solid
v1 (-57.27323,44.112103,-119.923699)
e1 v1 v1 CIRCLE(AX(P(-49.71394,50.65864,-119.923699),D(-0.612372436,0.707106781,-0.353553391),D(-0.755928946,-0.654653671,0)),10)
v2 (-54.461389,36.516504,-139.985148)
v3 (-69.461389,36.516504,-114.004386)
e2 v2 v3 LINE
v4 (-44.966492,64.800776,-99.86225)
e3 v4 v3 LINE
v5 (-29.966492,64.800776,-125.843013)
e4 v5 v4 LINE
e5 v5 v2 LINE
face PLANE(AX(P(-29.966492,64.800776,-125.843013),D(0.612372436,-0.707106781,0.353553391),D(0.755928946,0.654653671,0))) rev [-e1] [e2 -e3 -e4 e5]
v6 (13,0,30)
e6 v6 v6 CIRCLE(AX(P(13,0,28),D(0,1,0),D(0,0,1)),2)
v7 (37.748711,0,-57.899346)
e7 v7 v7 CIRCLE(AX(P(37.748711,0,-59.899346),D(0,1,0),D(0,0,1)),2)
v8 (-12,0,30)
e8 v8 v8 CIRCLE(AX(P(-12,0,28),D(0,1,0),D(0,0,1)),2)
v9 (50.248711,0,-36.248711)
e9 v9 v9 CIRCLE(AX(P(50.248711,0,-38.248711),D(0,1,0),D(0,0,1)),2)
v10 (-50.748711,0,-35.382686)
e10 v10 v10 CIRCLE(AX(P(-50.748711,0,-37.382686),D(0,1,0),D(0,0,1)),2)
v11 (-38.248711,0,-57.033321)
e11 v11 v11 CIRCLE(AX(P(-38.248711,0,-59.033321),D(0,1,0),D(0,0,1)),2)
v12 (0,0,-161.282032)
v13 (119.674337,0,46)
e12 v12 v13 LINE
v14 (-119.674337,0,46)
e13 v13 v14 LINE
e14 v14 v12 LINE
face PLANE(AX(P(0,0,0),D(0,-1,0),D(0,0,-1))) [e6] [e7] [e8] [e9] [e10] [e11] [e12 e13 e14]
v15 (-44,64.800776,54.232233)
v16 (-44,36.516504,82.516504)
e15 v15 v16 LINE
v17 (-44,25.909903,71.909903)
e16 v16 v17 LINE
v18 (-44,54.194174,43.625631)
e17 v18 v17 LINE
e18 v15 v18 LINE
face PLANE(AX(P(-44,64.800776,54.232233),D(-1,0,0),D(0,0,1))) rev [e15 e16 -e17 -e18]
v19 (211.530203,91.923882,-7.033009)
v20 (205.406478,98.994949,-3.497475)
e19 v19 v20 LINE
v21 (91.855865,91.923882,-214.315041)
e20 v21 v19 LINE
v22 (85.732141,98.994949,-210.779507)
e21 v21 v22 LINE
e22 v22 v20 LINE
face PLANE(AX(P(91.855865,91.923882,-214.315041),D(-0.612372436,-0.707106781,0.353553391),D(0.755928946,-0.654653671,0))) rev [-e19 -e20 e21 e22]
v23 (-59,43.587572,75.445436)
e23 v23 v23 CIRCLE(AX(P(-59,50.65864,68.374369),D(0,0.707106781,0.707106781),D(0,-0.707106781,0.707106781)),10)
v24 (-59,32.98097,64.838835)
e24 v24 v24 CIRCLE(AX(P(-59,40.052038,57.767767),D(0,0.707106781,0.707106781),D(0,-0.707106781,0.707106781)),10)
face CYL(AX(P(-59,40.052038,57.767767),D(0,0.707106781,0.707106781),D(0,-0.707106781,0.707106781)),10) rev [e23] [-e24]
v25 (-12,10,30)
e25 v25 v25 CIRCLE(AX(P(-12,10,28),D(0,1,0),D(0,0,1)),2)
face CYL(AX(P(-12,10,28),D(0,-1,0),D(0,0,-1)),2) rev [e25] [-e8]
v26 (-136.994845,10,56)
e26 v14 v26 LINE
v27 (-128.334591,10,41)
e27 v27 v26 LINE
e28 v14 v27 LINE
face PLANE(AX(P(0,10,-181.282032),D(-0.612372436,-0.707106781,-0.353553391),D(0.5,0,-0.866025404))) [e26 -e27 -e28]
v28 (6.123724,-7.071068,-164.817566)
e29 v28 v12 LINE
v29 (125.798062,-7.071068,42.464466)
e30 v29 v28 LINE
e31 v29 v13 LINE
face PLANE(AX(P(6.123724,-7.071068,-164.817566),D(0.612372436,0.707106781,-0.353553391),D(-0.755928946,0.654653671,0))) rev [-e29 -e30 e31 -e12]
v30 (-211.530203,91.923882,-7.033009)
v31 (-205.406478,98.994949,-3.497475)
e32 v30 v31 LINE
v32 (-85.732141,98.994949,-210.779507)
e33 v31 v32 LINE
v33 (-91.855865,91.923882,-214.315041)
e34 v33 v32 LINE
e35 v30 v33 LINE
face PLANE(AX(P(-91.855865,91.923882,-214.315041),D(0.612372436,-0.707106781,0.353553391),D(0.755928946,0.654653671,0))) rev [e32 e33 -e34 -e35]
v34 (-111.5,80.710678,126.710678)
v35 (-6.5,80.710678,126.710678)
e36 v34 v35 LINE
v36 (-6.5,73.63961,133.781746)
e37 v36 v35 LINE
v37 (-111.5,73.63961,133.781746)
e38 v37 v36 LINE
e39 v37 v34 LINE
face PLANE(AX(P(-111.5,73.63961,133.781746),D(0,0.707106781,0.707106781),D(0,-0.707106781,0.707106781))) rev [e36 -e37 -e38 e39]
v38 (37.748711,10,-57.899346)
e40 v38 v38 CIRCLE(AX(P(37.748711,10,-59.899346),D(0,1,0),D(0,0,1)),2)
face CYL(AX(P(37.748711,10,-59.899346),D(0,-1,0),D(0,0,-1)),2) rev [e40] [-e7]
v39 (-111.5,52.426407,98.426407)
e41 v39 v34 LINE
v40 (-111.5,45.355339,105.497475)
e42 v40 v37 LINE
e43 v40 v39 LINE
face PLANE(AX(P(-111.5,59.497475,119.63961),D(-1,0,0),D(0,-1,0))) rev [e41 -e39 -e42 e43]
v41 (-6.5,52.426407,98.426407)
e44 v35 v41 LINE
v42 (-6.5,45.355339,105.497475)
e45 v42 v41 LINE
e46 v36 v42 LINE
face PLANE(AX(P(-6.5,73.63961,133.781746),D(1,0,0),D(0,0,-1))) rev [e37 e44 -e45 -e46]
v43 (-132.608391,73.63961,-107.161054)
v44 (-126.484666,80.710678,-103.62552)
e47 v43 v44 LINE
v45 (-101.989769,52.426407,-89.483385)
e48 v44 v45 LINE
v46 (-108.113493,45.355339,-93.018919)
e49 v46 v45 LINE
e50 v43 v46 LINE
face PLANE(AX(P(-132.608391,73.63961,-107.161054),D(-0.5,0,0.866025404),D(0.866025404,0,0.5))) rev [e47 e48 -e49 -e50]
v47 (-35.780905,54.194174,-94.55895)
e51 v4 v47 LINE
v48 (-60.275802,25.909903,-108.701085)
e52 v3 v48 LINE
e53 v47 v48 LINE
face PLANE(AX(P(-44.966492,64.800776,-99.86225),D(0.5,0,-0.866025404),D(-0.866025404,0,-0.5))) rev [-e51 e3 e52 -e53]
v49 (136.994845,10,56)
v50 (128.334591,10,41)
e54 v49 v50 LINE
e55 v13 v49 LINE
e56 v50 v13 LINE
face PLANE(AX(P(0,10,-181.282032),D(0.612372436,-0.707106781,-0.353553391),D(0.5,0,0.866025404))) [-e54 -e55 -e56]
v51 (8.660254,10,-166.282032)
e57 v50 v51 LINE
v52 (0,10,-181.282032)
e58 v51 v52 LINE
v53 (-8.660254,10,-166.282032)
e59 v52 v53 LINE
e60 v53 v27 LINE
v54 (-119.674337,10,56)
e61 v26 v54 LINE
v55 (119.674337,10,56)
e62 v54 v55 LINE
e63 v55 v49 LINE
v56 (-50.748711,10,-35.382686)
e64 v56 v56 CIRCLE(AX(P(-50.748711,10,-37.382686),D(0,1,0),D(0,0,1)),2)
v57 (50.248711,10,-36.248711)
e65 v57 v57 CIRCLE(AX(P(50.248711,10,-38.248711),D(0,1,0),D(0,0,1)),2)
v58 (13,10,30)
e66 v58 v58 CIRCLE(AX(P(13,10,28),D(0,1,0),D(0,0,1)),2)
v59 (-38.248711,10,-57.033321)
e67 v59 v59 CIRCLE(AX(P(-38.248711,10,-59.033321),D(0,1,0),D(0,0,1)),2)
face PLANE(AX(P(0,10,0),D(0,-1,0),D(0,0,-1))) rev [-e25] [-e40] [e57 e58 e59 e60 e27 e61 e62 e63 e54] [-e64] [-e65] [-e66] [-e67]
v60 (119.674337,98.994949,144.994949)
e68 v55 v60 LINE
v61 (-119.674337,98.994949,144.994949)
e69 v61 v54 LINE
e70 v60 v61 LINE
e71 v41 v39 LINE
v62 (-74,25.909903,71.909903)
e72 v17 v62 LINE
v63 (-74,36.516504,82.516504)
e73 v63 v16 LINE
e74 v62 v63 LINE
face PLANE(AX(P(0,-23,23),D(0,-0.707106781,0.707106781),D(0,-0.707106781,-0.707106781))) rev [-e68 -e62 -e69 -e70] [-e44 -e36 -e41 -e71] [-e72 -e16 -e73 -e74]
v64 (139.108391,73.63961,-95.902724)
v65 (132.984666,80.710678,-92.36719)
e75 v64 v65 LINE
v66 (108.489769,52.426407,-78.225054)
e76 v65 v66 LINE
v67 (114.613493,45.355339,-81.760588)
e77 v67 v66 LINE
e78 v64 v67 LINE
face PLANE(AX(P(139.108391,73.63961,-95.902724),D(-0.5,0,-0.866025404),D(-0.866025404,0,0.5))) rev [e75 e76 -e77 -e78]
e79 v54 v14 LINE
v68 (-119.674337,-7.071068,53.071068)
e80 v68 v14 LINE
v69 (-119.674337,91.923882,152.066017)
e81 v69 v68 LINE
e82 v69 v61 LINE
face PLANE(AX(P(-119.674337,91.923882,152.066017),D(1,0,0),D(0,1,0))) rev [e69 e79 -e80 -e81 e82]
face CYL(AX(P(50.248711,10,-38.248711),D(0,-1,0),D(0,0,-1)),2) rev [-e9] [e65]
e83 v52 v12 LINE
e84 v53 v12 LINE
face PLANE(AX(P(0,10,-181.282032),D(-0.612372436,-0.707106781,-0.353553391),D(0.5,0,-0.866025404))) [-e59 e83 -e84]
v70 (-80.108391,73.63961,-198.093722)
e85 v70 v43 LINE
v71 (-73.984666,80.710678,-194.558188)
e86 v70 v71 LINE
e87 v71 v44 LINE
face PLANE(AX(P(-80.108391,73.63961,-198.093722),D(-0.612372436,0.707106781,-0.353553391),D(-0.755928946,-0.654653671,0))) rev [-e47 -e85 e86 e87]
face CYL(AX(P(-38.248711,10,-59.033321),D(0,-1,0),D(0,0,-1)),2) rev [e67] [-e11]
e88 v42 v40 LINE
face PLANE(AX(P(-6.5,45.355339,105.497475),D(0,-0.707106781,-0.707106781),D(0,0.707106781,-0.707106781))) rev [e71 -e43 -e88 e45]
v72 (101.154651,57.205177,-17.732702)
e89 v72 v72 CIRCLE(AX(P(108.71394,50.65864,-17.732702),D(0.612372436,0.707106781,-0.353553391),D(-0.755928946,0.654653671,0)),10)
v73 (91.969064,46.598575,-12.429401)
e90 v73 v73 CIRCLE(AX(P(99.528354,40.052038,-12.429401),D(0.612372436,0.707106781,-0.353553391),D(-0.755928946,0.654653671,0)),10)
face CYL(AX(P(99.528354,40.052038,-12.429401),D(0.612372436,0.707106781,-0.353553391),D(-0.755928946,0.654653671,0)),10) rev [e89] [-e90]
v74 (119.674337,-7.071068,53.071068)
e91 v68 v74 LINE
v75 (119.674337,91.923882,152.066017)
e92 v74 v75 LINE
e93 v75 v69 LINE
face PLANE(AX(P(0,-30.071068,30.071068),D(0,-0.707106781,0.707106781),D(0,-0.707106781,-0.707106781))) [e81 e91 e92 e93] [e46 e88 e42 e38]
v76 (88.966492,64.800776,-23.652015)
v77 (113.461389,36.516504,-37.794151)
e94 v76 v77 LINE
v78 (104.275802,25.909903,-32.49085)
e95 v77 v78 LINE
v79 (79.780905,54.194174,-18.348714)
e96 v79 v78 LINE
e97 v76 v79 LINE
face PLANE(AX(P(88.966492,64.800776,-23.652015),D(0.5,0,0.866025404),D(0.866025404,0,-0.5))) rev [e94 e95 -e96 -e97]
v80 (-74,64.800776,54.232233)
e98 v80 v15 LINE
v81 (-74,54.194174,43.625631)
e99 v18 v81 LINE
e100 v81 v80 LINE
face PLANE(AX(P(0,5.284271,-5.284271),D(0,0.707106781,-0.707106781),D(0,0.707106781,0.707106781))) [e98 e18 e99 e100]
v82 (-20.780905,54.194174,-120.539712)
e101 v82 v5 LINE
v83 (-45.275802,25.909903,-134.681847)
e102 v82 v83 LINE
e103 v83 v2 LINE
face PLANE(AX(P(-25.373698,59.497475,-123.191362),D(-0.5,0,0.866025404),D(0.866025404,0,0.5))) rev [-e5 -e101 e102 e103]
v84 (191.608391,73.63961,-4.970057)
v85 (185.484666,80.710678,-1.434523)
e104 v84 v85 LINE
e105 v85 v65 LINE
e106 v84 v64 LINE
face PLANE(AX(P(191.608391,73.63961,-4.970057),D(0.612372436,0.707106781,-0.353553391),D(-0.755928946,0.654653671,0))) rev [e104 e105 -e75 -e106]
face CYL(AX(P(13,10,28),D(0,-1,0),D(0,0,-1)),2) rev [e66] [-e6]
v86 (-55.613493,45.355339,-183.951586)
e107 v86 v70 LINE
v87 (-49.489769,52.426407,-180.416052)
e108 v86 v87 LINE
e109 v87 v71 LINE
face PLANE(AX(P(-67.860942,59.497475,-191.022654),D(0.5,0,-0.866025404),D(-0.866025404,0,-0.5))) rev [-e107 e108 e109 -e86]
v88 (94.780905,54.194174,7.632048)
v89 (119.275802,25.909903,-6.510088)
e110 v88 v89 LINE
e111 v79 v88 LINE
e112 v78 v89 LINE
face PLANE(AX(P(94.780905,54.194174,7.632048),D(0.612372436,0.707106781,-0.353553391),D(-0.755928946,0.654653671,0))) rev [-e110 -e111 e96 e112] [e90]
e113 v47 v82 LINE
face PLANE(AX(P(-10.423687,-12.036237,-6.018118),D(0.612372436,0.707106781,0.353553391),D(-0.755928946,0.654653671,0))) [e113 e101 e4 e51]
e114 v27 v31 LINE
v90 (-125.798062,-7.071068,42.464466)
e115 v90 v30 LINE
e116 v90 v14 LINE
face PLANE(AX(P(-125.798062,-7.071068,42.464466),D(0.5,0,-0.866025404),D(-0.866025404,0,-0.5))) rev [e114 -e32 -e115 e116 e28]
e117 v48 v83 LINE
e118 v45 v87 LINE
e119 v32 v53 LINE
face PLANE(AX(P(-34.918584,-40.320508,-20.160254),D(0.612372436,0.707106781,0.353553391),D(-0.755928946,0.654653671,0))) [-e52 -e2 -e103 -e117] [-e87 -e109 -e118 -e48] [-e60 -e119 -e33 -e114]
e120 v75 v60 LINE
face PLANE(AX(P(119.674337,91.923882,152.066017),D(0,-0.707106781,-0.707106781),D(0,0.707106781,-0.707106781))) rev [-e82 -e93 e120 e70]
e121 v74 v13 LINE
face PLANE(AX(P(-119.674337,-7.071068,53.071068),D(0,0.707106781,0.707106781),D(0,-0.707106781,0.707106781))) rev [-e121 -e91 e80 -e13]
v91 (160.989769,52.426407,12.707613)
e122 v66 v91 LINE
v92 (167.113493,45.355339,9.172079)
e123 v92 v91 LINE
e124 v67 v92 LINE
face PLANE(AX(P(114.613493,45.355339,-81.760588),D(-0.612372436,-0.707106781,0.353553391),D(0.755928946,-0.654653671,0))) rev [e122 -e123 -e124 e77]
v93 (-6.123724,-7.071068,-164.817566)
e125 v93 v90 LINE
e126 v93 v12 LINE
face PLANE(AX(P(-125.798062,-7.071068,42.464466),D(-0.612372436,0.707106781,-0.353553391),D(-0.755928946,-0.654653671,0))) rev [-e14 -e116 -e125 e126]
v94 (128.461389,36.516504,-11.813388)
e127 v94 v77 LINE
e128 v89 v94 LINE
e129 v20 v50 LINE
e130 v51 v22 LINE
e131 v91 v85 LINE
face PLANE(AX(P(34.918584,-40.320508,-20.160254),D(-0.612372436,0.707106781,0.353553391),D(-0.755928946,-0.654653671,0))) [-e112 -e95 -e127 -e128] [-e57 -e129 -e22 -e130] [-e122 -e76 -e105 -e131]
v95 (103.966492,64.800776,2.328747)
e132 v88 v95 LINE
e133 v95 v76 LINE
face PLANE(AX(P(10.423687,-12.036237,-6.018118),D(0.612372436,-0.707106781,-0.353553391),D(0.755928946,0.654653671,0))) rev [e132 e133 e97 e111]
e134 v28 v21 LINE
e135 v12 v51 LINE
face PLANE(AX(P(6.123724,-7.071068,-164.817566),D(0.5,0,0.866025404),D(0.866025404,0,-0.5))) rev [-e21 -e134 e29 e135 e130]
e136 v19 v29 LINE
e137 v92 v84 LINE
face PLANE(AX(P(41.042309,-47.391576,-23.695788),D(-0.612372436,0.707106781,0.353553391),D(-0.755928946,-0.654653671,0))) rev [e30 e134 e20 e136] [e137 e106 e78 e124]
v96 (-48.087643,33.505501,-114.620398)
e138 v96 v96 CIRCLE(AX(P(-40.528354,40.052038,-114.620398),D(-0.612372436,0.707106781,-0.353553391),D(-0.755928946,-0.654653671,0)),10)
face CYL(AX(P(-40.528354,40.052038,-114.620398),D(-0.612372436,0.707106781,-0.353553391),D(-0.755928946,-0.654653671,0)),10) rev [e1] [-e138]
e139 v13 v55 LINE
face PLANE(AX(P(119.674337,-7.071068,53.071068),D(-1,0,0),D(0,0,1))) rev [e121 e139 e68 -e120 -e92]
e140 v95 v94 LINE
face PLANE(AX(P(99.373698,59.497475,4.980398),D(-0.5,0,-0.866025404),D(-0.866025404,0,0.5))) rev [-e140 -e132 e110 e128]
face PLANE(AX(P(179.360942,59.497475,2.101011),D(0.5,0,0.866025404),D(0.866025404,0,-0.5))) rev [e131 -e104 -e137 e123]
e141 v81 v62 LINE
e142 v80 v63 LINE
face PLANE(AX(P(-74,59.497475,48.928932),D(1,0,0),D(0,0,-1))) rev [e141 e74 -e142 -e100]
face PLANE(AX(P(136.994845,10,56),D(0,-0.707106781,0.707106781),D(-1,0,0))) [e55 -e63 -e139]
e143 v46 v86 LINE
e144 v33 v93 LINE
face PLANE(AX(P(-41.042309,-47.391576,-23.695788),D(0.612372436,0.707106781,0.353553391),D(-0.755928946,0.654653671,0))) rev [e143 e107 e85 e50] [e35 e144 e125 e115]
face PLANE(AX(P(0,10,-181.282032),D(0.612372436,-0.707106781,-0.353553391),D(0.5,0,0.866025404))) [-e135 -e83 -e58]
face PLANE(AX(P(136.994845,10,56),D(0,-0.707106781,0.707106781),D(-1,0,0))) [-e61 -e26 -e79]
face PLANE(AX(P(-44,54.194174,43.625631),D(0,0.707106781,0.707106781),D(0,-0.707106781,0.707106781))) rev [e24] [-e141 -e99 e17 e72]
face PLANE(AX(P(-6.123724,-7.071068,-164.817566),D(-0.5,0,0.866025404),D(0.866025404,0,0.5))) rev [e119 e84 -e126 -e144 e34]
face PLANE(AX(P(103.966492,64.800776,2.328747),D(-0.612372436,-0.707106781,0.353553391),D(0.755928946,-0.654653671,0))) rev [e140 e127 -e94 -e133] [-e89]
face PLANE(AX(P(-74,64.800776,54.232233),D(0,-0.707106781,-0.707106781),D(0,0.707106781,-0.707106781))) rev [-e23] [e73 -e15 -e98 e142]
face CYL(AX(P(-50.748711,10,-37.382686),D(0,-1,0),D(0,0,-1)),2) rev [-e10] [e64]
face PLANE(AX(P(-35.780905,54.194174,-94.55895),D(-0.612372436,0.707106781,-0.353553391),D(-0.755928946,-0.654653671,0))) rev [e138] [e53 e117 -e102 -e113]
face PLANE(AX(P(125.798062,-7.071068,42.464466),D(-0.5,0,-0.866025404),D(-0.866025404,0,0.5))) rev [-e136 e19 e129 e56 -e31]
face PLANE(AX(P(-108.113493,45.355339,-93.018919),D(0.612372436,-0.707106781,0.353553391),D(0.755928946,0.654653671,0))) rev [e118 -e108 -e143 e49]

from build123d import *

# Parameters (mm, degrees)
SKETCH1_R           = 2
BOSS_EXTRUDE1_DEPTH = 10
CHAMFER2_SIZE       = 10
BOSS_EXTRUDE2_DEPTH = 10
BOSS_EXTRUDE3_DEPTH = 10
SKETCH6_W           = 239.348674296
SKETCH6_H           = 140
BOSS_EXTRUDE4_DEPTH = 10
CUT_EXTRUDE1_DEPTH  = 10
CUT_EXTRUDE2_DEPTH  = 10
CUT_EXTRUDE3_DEPTH  = 10
BOSS_EXTRUDE5_DEPTH = 40
SKETCH13_R          = 10
CUT_EXTRUDE4_DEPTH  = 15
BOSS_EXTRUDE6_DEPTH = 40
SKETCH15_R          = 10
CUT_EXTRUDE5_DEPTH  = 15
BOSS_EXTRUDE7_DEPTH = 40
SKETCH17_R          = 10
CUT_EXTRUDE6_DEPTH  = 15


with BuildPart() as part:
    # Sketch1 → Boss-Extrude1 (new body)
    with BuildSketch(Plane(origin=(0, 0, 0), x_dir=(1, 0, 0), z_dir=(0, 1, 0))):
        Polygon((0, 181.282032303), (-136.994845224, -56), (136.994845224, -56), align=None)
        with Locations(Location((-38.248711306, 59.033320997, 0), (0, 0, 270))):
            Circle(SKETCH1_R, mode=Mode.SUBTRACT)
        with Locations(Location((-50.748711306, 37.382685902, 0), (0, 0, 270))):
            Circle(SKETCH1_R, mode=Mode.SUBTRACT)
        with Locations(Location((37.748711306, 59.899346401, 0), (0, 0, 270))):
            Circle(SKETCH1_R, mode=Mode.SUBTRACT)
        with Locations(Location((50.248711306, 38.248711306, 0), (0, 0, 270))):
            Circle(SKETCH1_R, mode=Mode.SUBTRACT)
        with Locations(Location((-12, -28, 0), (0, 0, 270))):
            Circle(SKETCH1_R, mode=Mode.SUBTRACT)
        with Locations(Location((13, -28, 0), (0, 0, 270))):
            Circle(SKETCH1_R, mode=Mode.SUBTRACT)
    extrude(amount=BOSS_EXTRUDE1_DEPTH)

    # Chamfer2
    chamfer2_edges = [part.edges().sort_by_distance(p)[0] for p in [
        (68.497422612, 0, -62.641016151),
        (-68.497422612, 0, -62.641016151),
        (0, 0, 56),
    ]]
    chamfer(chamfer2_edges, length=CHAMFER2_SIZE - 0.0001)  # a hair under: the kernel refuses the full size

    # Sketch4 → Boss-Extrude2 (add)
    with BuildSketch(Plane(origin=(34.918584287, -40.320508076, -20.160254038), x_dir=(0.7905694150420945, 0.547722557505166, 0.2738612787525844), z_dir=(0.6123724356957949, -0.7071067811865465, -0.3535533905932751))):
        Polygon((107.208489537, 41.143650786), (215.652023231, -47.400123699), (64.274630088, -232.798809596), (-44.168903606, -144.255035111), align=None)
    extrude(amount=BOSS_EXTRUDE2_DEPTH)

    # Sketch5 → Boss-Extrude3 (add)
    with BuildSketch(Plane(origin=(-34.918584287, -40.320508076, -20.160254038), x_dir=(0.7905694150420941, -0.5477225575051675, -0.27386127875258237), z_dir=(-0.6123724356957955, -0.7071067811865476, -0.35355339059327195))):
        Polygon((44.168903606, -144.255035111), (-64.274630088, -232.798809596), (-215.652023231, -47.400123699), (-107.208489537, 41.143650786), align=None)
    extrude(amount=BOSS_EXTRUDE3_DEPTH)

    # Sketch6 → Boss-Extrude4 (add)
    with BuildSketch(Plane(origin=(0, -23, 23), x_dir=(1, 0, 0), z_dir=(0, -0.7071067811865468, 0.7071067811865483))):
        with Locations((0, 102.526911935)):
            Rectangle(SKETCH6_W, SKETCH6_H)
    extrude(amount=BOSS_EXTRUDE4_DEPTH)

    # Sketch8 → Cut-Extrude1 (cut)
    with BuildSketch(Plane(origin=(-34.918584287, -40.320508076, -20.160254038), x_dir=(0.7905694150420941, -0.5477225575051675, -0.2738612787525823), z_dir=(0.6123724356957955, 0.7071067811865477, 0.35355339059327195))):
        Polygon((-33.923185833, 197.463935256), (-49.415119218, 210.113045896), (-115.822950082, 128.780395626), (-84.839083312, 103.482174345), (-18.431252448, 184.814824615), align=None)
    extrude(amount=-CUT_EXTRUDE1_DEPTH, mode=Mode.SUBTRACT)

    # Sketch10 → Cut-Extrude2 (cut)
    with BuildSketch(Plane(origin=(34.918584287, -40.320508076, -20.160254038), x_dir=(0.7905694150420944, 0.5477225575051661, 0.2738612787525847), z_dir=(-0.6123724356957952, 0.7071067811865464, 0.3535533905932753))):
        Polygon((174.960769477, 24.728878015), (190.452702862, 37.377988656), (124.044871998, 118.710638926), (93.061005228, 93.412417645), (159.468836092, 12.079767374), align=None)
    extrude(amount=-CUT_EXTRUDE2_DEPTH, mode=Mode.SUBTRACT)

    # Sketch11 → Cut-Extrude3 (cut)
    with BuildSketch(Plane(origin=(0, -23, 23), x_dir=(1, 0, 0), z_dir=(0, 0.7071067811865468, -0.7071067811865483))):
        Polygon((-111.5, -126.669047558), (-111.5, -146.669047558), (-6.5, -146.669047558), (-6.5, -106.669047558), (-111.5, -106.669047558), align=None)
    extrude(amount=-CUT_EXTRUDE3_DEPTH, mode=Mode.SUBTRACT)

    # Sketch12 → Boss-Extrude5 (add)
    with BuildSketch(Plane(origin=(-34.918584287, -40.320508076, -20.160254038), x_dir=(0.7905694150420941, -0.5477225575051675, -0.2738612787525823), z_dir=(0.6123724356957955, 0.7071067811865477, 0.35355339059327195))):
        Polygon((-18.910434822, 136.793783558), (-24.719909842, 141.537200048), (-43.693575803, 118.299299971), (-32.074625764, 108.81246699), (-13.100959803, 132.050367067), align=None)
    extrude(amount=BOSS_EXTRUDE5_DEPTH)

    # Sketch13 → Cut-Extrude4 (cut)
    with BuildSketch(Plane(origin=(-66.542804663, 76.83701237, -38.418506185), x_dir=(0.7905694150420933, 0.5477225575051691, -0.27386127875258187), z_dir=(-0.6123724356957966, 0.7071067811865475, -0.35355339059327057))):
        with Locations(Location((21.287016809, 84.607785007, 0), (0, 0, 162.976133815))):
            Circle(SKETCH13_R)
    extrude(amount=-CUT_EXTRUDE4_DEPTH, mode=Mode.SUBTRACT)

    # Sketch14 → Boss-Extrude6 (add)
    with BuildSketch(Plane(origin=(34.918584287, -40.320508076, -20.160254038), x_dir=(0.7905694150420944, 0.5477225575051661, 0.2738612787525847), z_dir=(-0.6123724356957952, 0.7071067811865464, 0.3535533905932753))):
        Polygon((112.513853563, 22.15347651), (118.323328583, 26.896893), (99.349662622, 50.134793077), (87.730712583, 40.647960097), (106.704378544, 17.41006002), align=None)
    extrude(amount=BOSS_EXTRUDE6_DEPTH)

    # Sketch15 → Cut-Extrude5 (cut)
    with BuildSketch(Plane(origin=(66.542804663, 76.83701237, -38.418506185), x_dir=(0.7905694150420963, -0.5477225575051645, 0.2738612787525824), z_dir=(0.6123724356957928, 0.7071067811865488, -0.3535533905932746))):
        with Locations(Location((53.342735971, -6.794621963, 0), (0, 0, 197.023866185))):
            Circle(SKETCH15_R)
    extrude(amount=-CUT_EXTRUDE5_DEPTH, mode=Mode.SUBTRACT)

    # Sketch16 → Boss-Extrude7 (add)
    with BuildSketch(Plane(origin=(0, -23, 23), x_dir=(1, 0, 0), z_dir=(0, 0.7071067811865468, -0.7071067811865483))):
        Polygon((-74, -76.669047558), (-74, -84.169047558), (-44, -84.169047558), (-44, -69.169047558), (-74, -69.169047558), align=None)
    extrude(amount=BOSS_EXTRUDE7_DEPTH)

    # Sketch17 → Cut-Extrude6 (cut)
    with BuildSketch(Plane(origin=(0, 59.516504294, 59.516504294), x_dir=(1, 0, 0), z_dir=(0, 0.7071067811865482, 0.7071067811865468))):
        with Locations(Location((-59, -12.526911935, 0), (0, 0, 270))):
            Circle(SKETCH17_R)
    extrude(amount=-CUT_EXTRUDE6_DEPTH, mode=Mode.SUBTRACT)


solid = part.part
